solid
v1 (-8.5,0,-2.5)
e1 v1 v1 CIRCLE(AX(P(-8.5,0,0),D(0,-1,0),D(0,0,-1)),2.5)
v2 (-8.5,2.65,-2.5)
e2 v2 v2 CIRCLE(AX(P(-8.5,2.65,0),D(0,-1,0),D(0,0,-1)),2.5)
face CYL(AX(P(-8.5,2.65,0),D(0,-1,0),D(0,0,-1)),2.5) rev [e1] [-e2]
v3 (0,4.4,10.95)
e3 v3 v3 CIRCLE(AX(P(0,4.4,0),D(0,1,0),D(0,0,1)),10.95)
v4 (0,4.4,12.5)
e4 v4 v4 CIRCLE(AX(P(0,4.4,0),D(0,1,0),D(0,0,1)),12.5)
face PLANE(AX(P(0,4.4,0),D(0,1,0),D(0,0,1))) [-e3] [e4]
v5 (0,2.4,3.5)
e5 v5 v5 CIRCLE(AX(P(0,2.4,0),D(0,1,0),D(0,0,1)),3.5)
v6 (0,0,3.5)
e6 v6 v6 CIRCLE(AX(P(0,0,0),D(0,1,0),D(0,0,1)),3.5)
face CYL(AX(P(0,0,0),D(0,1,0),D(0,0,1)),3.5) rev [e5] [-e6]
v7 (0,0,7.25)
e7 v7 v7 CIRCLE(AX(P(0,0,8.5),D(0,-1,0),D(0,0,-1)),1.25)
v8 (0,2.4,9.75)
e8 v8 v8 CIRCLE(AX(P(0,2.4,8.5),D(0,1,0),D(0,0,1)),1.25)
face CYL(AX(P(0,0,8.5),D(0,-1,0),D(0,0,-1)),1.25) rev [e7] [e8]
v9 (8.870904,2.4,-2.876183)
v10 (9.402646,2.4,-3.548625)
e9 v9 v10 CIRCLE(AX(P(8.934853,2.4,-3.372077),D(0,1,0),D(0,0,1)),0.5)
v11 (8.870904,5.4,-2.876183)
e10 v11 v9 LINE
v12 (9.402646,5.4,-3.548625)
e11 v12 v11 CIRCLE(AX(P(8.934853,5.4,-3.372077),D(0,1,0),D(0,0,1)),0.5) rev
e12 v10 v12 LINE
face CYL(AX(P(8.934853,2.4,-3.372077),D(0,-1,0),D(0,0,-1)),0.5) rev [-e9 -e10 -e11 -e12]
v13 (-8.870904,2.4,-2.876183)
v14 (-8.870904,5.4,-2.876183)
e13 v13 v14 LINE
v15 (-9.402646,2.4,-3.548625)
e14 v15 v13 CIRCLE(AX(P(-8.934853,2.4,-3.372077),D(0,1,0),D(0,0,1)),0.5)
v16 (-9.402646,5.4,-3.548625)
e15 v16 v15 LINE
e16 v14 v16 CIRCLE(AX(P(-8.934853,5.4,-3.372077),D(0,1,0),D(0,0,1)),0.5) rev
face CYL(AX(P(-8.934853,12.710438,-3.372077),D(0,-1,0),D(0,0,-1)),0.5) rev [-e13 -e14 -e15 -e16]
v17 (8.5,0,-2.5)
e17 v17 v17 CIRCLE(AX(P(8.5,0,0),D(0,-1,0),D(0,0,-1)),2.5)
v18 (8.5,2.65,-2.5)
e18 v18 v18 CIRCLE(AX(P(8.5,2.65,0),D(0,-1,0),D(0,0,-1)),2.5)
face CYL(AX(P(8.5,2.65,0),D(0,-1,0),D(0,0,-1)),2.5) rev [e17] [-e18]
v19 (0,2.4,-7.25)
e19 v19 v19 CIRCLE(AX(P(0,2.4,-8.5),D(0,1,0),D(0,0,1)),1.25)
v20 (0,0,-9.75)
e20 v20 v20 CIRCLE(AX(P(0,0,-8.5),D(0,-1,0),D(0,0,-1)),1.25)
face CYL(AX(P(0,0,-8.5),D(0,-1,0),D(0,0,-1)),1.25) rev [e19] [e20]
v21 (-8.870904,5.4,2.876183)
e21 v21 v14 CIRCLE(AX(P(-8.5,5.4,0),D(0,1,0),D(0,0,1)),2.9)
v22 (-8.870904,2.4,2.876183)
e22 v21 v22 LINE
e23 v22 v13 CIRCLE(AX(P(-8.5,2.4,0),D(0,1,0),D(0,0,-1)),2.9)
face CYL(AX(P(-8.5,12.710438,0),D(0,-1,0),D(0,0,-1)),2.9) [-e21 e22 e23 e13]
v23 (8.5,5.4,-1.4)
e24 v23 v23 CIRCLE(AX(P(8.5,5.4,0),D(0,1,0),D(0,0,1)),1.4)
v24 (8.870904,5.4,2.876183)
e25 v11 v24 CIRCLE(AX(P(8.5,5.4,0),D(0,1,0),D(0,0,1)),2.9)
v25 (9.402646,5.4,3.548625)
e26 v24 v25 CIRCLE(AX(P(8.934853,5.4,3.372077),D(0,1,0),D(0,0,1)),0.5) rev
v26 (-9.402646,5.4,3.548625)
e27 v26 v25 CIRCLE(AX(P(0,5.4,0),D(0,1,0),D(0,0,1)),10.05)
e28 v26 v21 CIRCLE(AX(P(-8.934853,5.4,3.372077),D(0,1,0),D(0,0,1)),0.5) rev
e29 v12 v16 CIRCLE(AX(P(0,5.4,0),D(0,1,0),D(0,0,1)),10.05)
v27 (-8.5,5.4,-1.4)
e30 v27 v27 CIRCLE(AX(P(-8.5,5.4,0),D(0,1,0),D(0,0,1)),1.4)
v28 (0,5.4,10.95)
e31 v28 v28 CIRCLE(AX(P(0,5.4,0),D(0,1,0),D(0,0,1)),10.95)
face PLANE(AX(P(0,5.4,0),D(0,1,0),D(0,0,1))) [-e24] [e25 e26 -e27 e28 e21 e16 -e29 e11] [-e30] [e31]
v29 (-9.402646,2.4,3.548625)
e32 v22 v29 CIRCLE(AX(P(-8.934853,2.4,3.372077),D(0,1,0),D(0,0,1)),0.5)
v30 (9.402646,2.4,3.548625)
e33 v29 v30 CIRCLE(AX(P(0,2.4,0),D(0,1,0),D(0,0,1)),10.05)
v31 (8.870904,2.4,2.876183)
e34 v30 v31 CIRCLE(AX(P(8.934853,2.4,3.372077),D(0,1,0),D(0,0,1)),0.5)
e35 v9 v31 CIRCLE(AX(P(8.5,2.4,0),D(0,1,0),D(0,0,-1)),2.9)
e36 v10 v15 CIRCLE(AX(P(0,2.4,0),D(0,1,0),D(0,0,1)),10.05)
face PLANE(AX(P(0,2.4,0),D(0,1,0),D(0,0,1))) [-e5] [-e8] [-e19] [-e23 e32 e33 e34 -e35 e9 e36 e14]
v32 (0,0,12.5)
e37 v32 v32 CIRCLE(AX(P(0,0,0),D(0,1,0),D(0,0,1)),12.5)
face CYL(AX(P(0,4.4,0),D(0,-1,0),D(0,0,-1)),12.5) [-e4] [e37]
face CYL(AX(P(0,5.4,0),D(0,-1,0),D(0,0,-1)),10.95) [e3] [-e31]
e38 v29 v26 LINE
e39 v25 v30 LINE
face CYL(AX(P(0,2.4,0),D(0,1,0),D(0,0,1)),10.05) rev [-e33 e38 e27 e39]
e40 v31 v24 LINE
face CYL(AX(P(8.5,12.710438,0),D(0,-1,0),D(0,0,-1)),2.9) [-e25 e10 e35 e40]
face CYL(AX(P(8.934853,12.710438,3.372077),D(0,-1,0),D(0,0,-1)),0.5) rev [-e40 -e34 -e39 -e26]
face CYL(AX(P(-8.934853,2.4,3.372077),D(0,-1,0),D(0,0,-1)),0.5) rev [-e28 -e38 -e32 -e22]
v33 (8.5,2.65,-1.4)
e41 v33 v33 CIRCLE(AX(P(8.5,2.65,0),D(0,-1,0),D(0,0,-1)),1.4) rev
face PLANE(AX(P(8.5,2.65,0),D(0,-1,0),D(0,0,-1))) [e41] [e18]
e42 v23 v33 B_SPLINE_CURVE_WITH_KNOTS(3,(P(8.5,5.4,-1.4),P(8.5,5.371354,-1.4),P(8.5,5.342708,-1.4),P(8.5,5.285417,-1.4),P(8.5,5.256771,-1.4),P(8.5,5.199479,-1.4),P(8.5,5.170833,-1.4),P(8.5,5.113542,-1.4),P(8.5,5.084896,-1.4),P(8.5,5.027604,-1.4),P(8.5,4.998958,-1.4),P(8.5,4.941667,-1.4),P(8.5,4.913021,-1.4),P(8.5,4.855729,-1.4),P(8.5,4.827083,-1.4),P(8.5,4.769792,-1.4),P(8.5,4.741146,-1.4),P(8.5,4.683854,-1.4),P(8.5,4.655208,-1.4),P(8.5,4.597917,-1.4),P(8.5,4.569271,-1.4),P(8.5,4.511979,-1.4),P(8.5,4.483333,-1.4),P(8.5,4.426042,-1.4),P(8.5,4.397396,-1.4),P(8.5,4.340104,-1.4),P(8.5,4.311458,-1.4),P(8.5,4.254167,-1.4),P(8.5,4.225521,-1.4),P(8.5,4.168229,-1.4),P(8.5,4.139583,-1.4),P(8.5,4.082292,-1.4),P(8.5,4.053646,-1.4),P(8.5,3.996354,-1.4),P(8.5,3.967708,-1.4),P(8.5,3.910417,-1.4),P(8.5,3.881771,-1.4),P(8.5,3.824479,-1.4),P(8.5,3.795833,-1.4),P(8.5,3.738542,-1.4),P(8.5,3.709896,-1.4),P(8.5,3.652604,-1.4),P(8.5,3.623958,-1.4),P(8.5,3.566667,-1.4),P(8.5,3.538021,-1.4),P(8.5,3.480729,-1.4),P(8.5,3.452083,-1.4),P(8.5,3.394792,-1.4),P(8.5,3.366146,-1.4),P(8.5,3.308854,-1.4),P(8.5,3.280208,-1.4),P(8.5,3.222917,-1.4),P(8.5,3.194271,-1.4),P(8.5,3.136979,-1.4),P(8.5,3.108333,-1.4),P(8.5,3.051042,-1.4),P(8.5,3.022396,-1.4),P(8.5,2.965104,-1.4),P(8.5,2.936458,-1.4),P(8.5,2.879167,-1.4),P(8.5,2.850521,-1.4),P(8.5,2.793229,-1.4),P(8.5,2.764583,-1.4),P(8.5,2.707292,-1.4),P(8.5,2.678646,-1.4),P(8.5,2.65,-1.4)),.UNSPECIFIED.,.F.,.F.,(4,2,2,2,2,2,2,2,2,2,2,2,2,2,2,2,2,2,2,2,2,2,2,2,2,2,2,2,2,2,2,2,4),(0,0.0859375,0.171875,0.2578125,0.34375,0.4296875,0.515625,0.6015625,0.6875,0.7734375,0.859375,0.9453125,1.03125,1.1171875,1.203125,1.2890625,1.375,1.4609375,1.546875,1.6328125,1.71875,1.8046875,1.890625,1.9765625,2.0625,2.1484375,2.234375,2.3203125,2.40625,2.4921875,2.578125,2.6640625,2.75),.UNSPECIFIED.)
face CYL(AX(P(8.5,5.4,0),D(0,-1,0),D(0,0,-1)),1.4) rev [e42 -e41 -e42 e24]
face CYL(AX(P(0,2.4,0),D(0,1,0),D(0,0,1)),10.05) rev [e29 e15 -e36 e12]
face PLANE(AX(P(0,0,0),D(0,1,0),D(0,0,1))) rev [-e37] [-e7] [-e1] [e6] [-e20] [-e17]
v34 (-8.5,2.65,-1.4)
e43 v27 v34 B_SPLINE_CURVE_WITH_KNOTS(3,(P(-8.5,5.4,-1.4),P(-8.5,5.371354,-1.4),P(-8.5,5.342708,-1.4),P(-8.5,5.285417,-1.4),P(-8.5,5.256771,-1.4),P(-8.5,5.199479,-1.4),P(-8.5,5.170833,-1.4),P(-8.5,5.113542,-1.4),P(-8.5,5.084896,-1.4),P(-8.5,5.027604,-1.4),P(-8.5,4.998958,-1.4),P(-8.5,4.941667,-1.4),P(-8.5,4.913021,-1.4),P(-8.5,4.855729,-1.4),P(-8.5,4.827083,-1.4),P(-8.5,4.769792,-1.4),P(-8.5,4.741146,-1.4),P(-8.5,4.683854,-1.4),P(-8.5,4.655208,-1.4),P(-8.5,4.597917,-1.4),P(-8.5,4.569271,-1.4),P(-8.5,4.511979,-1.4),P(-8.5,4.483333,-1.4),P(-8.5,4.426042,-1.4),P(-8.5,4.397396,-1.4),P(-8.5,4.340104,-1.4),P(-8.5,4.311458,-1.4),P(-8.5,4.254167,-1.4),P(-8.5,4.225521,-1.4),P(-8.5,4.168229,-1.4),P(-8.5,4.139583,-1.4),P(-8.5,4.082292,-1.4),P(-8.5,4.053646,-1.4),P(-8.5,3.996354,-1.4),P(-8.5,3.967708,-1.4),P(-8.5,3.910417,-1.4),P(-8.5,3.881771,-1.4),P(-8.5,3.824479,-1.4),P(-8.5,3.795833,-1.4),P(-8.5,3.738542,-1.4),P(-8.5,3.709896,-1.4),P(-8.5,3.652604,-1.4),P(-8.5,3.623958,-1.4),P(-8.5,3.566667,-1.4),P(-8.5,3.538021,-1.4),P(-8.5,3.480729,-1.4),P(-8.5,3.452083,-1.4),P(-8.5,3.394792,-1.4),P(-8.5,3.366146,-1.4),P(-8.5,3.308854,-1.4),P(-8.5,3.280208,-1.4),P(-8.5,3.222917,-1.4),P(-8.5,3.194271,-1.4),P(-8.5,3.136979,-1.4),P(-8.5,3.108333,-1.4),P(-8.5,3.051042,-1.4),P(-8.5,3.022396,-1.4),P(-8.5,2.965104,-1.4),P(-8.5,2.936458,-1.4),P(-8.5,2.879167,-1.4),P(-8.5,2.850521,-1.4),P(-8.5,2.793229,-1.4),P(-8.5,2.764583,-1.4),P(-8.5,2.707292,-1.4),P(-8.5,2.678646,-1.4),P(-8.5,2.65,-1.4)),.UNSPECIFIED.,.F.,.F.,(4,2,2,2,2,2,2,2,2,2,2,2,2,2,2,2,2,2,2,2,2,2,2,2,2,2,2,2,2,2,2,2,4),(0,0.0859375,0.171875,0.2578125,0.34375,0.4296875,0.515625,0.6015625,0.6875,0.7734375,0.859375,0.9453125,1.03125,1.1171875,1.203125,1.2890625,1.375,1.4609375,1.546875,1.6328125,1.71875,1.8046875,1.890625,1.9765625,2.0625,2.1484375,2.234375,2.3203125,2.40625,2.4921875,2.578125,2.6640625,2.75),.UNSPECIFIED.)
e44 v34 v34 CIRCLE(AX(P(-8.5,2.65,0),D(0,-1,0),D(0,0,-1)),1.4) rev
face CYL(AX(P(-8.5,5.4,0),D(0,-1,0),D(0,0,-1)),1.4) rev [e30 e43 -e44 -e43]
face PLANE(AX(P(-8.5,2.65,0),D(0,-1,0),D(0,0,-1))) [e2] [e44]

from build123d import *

# Parameters (mm, degrees)
SKETCH1_R             = 12.5
BOSS_EXTRUDE1_DEPTH   = 4.4
SKETCH2_R             = 10.95
BOSS_EXTRUDE2_DEPTH   = 1
SKETCH3_R             = 10.05
CUT_EXTRUDE1_DEPTH    = 3
SKETCH4_R             = 3.5
CUT_EXTRUDE2_DEPTH    = 18.930421077
SKETCH5_R             = 1.4
CUT_EXTRUDE3_DEPTH    = 19.484047176
SKETCH6_R             = 1.4
BOSS_EXTRUDE3_DEPTH   = 3
FILLET1_R             = 0.5
SKETCH7_R             = 2.5
CUT_EXTRUDE4_DEPTH    = 2.65
M3X0_5_TAPPED_HOLE1_D = 2.5


with BuildPart() as part:
    # Sketch1 → Boss-Extrude1 (new body)
    with BuildSketch(Plane(origin=(0, 0, 0), x_dir=(1, 0, 0), z_dir=(0, 1, 0))):
        with Locations(Location((0, 0, 0), (0, 0, 270))):
            Circle(SKETCH1_R)
    extrude(amount=BOSS_EXTRUDE1_DEPTH)

    # Sketch2 → Boss-Extrude2 (add)
    with BuildSketch(Plane(origin=(0, 4.4, 0), x_dir=(1, 0, 0), z_dir=(0, 1, 0))):
        with Locations(Location((0, 0, 0), (0, 0, 270))):
            Circle(SKETCH2_R)
    extrude(amount=BOSS_EXTRUDE2_DEPTH)

    # Sketch3 → Cut-Extrude1 (cut)
    with BuildSketch(Plane(origin=(0, 5.4, 0), x_dir=(1, 0, 0), z_dir=(0, 1, 0))):
        with Locations(Location((0, 0, 0), (0, 0, 270))):
            Circle(SKETCH3_R)
    extrude(amount=-CUT_EXTRUDE1_DEPTH, mode=Mode.SUBTRACT)

    # Sketch4 → Cut-Extrude2 (cut, through all)
    with BuildSketch(Plane(origin=(0, 2.4, 0), x_dir=(1, 0, 0), z_dir=(0, 1, 0))):
        with Locations(Location((0, 0, 0), (0, 0, 270))):
            Circle(SKETCH4_R)
    extrude(amount=-CUT_EXTRUDE2_DEPTH, mode=Mode.SUBTRACT)

    # Sketch5 → Cut-Extrude3 (cut, through all)
    with BuildSketch(Plane.XZ):
        with Locations(Location((-8.5, 0, 0), (0, 0, 270))):
            Circle(SKETCH5_R)
        with Locations(Location((8.5, 0, 0), (0, 0, 270))):
            Circle(SKETCH5_R)
    extrude(amount=-CUT_EXTRUDE3_DEPTH, mode=Mode.SUBTRACT)

    # Sketch6 → Boss-Extrude3 (add)
    # profile 1 of 2: a face of its own
    with BuildSketch(Plane(origin=(0, 2.4, 0), x_dir=(1, 0, 0), z_dir=(0, 1, 0))):
        with BuildLine():
            ThreePointArc((-9.696617647, 2.641610533), (-5.6, 0), (-9.696617647, -2.641610533))
            ThreePointArc((-9.696617647, -2.641610533), (-10.05, 0), (-9.696617647, 2.641610533))
        make_face()
        with Locations(Location((-8.5, 0, 0), (0, 0, 90))):
            Circle(SKETCH6_R, mode=Mode.SUBTRACT)
    # profile 2 of 2: a face of its own
    with BuildSketch(Plane(origin=(0, 2.4, 0), x_dir=(1, 0, 0), z_dir=(0, 1, 0))):
        with BuildLine():
            ThreePointArc((9.696617647, -2.641610533), (5.6, 0), (9.696617647, 2.641610533))
            ThreePointArc((9.696617647, 2.641610533), (10.05, 0), (9.696617647, -2.641610533))
        make_face()
        with Locations(Location((8.5, 0, 0), (0, 0, 90))):
            Circle(SKETCH6_R, mode=Mode.SUBTRACT)
    extrude(amount=BOSS_EXTRUDE3_DEPTH)

    # Fillet1
    # the kernel refuses this fillet: 0.5 mm, written as the material it adds along each edge
    with BuildSketch(Plane(origin=(-9.696617647, 0.016337815, 2.641610533), x_dir=(0.30831902274011397, 0, 0.9512830179376593), z_dir=(0, 1, 0)), Plane(origin=(9.696617647, 0.016337815, -2.641610533), x_dir=(-0.30831902274011413, 0, -0.9512830179376593), z_dir=(0, 1, 0))) as fillet1_piece_1:
        with BuildLine():
            CenterArc((0.929746842, 0.499437138), FILLET1_R, 154.693905627, 118.025000924)
            ThreePointArc((0.477728298, 0.713164151), (0.265396902, 0.338808542), (0, 0))
            ThreePointArc((0, 0), (0.476732437, -0.011313523), (0.953464874, 0))
        make_face()
    extrude(amount=5.383662185)
    with BuildSketch(Plane(origin=(-9.696617647, 0.016337815, -2.641610533), x_dir=(0.9619368896352812, 0, -0.2732716969589074), z_dir=(0, 1, 0)), Plane(origin=(9.696617647, 0.016337815, 2.641610533), x_dir=(-0.9619368896352809, 0, 0.2732716969589082), z_dir=(0, 1, 0))) as fillet1_piece_2:
        with BuildLine():
            CenterArc((0.932385368, 0.494493854), FILLET1_R, 143.464092257, 118.025000924)
            ThreePointArc((0.530643407, 0.792157081), (0.255922209, 0.402374993), (0, 0))
            ThreePointArc((0, 0), (0.429193265, 0.031935645), (0.858386529, 0))
        make_face()
    extrude(amount=5.383662185)

    # Sketch7 → Cut-Extrude4 (cut)
    with BuildSketch(Plane.XZ):
        with Locations(Location((-8.5, 0, 0), (0, 0, 270))):
            Circle(SKETCH7_R)
        with Locations(Location((8.5, 0, 0), (0, 0, 270))):
            Circle(SKETCH7_R)
    extrude(amount=-CUT_EXTRUDE4_DEPTH, mode=Mode.SUBTRACT)

    # M3x0.5 Tapped Hole1 (through all)
    with Locations(Plane(origin=(0, 0, 0), x_dir=(-1, 0, 0), z_dir=(0, -1, 0))):
        with Locations((0, 8.5), (0, -8.5)):
            Hole(M3X0_5_TAPPED_HOLE1_D / 2)


solid = part.part
